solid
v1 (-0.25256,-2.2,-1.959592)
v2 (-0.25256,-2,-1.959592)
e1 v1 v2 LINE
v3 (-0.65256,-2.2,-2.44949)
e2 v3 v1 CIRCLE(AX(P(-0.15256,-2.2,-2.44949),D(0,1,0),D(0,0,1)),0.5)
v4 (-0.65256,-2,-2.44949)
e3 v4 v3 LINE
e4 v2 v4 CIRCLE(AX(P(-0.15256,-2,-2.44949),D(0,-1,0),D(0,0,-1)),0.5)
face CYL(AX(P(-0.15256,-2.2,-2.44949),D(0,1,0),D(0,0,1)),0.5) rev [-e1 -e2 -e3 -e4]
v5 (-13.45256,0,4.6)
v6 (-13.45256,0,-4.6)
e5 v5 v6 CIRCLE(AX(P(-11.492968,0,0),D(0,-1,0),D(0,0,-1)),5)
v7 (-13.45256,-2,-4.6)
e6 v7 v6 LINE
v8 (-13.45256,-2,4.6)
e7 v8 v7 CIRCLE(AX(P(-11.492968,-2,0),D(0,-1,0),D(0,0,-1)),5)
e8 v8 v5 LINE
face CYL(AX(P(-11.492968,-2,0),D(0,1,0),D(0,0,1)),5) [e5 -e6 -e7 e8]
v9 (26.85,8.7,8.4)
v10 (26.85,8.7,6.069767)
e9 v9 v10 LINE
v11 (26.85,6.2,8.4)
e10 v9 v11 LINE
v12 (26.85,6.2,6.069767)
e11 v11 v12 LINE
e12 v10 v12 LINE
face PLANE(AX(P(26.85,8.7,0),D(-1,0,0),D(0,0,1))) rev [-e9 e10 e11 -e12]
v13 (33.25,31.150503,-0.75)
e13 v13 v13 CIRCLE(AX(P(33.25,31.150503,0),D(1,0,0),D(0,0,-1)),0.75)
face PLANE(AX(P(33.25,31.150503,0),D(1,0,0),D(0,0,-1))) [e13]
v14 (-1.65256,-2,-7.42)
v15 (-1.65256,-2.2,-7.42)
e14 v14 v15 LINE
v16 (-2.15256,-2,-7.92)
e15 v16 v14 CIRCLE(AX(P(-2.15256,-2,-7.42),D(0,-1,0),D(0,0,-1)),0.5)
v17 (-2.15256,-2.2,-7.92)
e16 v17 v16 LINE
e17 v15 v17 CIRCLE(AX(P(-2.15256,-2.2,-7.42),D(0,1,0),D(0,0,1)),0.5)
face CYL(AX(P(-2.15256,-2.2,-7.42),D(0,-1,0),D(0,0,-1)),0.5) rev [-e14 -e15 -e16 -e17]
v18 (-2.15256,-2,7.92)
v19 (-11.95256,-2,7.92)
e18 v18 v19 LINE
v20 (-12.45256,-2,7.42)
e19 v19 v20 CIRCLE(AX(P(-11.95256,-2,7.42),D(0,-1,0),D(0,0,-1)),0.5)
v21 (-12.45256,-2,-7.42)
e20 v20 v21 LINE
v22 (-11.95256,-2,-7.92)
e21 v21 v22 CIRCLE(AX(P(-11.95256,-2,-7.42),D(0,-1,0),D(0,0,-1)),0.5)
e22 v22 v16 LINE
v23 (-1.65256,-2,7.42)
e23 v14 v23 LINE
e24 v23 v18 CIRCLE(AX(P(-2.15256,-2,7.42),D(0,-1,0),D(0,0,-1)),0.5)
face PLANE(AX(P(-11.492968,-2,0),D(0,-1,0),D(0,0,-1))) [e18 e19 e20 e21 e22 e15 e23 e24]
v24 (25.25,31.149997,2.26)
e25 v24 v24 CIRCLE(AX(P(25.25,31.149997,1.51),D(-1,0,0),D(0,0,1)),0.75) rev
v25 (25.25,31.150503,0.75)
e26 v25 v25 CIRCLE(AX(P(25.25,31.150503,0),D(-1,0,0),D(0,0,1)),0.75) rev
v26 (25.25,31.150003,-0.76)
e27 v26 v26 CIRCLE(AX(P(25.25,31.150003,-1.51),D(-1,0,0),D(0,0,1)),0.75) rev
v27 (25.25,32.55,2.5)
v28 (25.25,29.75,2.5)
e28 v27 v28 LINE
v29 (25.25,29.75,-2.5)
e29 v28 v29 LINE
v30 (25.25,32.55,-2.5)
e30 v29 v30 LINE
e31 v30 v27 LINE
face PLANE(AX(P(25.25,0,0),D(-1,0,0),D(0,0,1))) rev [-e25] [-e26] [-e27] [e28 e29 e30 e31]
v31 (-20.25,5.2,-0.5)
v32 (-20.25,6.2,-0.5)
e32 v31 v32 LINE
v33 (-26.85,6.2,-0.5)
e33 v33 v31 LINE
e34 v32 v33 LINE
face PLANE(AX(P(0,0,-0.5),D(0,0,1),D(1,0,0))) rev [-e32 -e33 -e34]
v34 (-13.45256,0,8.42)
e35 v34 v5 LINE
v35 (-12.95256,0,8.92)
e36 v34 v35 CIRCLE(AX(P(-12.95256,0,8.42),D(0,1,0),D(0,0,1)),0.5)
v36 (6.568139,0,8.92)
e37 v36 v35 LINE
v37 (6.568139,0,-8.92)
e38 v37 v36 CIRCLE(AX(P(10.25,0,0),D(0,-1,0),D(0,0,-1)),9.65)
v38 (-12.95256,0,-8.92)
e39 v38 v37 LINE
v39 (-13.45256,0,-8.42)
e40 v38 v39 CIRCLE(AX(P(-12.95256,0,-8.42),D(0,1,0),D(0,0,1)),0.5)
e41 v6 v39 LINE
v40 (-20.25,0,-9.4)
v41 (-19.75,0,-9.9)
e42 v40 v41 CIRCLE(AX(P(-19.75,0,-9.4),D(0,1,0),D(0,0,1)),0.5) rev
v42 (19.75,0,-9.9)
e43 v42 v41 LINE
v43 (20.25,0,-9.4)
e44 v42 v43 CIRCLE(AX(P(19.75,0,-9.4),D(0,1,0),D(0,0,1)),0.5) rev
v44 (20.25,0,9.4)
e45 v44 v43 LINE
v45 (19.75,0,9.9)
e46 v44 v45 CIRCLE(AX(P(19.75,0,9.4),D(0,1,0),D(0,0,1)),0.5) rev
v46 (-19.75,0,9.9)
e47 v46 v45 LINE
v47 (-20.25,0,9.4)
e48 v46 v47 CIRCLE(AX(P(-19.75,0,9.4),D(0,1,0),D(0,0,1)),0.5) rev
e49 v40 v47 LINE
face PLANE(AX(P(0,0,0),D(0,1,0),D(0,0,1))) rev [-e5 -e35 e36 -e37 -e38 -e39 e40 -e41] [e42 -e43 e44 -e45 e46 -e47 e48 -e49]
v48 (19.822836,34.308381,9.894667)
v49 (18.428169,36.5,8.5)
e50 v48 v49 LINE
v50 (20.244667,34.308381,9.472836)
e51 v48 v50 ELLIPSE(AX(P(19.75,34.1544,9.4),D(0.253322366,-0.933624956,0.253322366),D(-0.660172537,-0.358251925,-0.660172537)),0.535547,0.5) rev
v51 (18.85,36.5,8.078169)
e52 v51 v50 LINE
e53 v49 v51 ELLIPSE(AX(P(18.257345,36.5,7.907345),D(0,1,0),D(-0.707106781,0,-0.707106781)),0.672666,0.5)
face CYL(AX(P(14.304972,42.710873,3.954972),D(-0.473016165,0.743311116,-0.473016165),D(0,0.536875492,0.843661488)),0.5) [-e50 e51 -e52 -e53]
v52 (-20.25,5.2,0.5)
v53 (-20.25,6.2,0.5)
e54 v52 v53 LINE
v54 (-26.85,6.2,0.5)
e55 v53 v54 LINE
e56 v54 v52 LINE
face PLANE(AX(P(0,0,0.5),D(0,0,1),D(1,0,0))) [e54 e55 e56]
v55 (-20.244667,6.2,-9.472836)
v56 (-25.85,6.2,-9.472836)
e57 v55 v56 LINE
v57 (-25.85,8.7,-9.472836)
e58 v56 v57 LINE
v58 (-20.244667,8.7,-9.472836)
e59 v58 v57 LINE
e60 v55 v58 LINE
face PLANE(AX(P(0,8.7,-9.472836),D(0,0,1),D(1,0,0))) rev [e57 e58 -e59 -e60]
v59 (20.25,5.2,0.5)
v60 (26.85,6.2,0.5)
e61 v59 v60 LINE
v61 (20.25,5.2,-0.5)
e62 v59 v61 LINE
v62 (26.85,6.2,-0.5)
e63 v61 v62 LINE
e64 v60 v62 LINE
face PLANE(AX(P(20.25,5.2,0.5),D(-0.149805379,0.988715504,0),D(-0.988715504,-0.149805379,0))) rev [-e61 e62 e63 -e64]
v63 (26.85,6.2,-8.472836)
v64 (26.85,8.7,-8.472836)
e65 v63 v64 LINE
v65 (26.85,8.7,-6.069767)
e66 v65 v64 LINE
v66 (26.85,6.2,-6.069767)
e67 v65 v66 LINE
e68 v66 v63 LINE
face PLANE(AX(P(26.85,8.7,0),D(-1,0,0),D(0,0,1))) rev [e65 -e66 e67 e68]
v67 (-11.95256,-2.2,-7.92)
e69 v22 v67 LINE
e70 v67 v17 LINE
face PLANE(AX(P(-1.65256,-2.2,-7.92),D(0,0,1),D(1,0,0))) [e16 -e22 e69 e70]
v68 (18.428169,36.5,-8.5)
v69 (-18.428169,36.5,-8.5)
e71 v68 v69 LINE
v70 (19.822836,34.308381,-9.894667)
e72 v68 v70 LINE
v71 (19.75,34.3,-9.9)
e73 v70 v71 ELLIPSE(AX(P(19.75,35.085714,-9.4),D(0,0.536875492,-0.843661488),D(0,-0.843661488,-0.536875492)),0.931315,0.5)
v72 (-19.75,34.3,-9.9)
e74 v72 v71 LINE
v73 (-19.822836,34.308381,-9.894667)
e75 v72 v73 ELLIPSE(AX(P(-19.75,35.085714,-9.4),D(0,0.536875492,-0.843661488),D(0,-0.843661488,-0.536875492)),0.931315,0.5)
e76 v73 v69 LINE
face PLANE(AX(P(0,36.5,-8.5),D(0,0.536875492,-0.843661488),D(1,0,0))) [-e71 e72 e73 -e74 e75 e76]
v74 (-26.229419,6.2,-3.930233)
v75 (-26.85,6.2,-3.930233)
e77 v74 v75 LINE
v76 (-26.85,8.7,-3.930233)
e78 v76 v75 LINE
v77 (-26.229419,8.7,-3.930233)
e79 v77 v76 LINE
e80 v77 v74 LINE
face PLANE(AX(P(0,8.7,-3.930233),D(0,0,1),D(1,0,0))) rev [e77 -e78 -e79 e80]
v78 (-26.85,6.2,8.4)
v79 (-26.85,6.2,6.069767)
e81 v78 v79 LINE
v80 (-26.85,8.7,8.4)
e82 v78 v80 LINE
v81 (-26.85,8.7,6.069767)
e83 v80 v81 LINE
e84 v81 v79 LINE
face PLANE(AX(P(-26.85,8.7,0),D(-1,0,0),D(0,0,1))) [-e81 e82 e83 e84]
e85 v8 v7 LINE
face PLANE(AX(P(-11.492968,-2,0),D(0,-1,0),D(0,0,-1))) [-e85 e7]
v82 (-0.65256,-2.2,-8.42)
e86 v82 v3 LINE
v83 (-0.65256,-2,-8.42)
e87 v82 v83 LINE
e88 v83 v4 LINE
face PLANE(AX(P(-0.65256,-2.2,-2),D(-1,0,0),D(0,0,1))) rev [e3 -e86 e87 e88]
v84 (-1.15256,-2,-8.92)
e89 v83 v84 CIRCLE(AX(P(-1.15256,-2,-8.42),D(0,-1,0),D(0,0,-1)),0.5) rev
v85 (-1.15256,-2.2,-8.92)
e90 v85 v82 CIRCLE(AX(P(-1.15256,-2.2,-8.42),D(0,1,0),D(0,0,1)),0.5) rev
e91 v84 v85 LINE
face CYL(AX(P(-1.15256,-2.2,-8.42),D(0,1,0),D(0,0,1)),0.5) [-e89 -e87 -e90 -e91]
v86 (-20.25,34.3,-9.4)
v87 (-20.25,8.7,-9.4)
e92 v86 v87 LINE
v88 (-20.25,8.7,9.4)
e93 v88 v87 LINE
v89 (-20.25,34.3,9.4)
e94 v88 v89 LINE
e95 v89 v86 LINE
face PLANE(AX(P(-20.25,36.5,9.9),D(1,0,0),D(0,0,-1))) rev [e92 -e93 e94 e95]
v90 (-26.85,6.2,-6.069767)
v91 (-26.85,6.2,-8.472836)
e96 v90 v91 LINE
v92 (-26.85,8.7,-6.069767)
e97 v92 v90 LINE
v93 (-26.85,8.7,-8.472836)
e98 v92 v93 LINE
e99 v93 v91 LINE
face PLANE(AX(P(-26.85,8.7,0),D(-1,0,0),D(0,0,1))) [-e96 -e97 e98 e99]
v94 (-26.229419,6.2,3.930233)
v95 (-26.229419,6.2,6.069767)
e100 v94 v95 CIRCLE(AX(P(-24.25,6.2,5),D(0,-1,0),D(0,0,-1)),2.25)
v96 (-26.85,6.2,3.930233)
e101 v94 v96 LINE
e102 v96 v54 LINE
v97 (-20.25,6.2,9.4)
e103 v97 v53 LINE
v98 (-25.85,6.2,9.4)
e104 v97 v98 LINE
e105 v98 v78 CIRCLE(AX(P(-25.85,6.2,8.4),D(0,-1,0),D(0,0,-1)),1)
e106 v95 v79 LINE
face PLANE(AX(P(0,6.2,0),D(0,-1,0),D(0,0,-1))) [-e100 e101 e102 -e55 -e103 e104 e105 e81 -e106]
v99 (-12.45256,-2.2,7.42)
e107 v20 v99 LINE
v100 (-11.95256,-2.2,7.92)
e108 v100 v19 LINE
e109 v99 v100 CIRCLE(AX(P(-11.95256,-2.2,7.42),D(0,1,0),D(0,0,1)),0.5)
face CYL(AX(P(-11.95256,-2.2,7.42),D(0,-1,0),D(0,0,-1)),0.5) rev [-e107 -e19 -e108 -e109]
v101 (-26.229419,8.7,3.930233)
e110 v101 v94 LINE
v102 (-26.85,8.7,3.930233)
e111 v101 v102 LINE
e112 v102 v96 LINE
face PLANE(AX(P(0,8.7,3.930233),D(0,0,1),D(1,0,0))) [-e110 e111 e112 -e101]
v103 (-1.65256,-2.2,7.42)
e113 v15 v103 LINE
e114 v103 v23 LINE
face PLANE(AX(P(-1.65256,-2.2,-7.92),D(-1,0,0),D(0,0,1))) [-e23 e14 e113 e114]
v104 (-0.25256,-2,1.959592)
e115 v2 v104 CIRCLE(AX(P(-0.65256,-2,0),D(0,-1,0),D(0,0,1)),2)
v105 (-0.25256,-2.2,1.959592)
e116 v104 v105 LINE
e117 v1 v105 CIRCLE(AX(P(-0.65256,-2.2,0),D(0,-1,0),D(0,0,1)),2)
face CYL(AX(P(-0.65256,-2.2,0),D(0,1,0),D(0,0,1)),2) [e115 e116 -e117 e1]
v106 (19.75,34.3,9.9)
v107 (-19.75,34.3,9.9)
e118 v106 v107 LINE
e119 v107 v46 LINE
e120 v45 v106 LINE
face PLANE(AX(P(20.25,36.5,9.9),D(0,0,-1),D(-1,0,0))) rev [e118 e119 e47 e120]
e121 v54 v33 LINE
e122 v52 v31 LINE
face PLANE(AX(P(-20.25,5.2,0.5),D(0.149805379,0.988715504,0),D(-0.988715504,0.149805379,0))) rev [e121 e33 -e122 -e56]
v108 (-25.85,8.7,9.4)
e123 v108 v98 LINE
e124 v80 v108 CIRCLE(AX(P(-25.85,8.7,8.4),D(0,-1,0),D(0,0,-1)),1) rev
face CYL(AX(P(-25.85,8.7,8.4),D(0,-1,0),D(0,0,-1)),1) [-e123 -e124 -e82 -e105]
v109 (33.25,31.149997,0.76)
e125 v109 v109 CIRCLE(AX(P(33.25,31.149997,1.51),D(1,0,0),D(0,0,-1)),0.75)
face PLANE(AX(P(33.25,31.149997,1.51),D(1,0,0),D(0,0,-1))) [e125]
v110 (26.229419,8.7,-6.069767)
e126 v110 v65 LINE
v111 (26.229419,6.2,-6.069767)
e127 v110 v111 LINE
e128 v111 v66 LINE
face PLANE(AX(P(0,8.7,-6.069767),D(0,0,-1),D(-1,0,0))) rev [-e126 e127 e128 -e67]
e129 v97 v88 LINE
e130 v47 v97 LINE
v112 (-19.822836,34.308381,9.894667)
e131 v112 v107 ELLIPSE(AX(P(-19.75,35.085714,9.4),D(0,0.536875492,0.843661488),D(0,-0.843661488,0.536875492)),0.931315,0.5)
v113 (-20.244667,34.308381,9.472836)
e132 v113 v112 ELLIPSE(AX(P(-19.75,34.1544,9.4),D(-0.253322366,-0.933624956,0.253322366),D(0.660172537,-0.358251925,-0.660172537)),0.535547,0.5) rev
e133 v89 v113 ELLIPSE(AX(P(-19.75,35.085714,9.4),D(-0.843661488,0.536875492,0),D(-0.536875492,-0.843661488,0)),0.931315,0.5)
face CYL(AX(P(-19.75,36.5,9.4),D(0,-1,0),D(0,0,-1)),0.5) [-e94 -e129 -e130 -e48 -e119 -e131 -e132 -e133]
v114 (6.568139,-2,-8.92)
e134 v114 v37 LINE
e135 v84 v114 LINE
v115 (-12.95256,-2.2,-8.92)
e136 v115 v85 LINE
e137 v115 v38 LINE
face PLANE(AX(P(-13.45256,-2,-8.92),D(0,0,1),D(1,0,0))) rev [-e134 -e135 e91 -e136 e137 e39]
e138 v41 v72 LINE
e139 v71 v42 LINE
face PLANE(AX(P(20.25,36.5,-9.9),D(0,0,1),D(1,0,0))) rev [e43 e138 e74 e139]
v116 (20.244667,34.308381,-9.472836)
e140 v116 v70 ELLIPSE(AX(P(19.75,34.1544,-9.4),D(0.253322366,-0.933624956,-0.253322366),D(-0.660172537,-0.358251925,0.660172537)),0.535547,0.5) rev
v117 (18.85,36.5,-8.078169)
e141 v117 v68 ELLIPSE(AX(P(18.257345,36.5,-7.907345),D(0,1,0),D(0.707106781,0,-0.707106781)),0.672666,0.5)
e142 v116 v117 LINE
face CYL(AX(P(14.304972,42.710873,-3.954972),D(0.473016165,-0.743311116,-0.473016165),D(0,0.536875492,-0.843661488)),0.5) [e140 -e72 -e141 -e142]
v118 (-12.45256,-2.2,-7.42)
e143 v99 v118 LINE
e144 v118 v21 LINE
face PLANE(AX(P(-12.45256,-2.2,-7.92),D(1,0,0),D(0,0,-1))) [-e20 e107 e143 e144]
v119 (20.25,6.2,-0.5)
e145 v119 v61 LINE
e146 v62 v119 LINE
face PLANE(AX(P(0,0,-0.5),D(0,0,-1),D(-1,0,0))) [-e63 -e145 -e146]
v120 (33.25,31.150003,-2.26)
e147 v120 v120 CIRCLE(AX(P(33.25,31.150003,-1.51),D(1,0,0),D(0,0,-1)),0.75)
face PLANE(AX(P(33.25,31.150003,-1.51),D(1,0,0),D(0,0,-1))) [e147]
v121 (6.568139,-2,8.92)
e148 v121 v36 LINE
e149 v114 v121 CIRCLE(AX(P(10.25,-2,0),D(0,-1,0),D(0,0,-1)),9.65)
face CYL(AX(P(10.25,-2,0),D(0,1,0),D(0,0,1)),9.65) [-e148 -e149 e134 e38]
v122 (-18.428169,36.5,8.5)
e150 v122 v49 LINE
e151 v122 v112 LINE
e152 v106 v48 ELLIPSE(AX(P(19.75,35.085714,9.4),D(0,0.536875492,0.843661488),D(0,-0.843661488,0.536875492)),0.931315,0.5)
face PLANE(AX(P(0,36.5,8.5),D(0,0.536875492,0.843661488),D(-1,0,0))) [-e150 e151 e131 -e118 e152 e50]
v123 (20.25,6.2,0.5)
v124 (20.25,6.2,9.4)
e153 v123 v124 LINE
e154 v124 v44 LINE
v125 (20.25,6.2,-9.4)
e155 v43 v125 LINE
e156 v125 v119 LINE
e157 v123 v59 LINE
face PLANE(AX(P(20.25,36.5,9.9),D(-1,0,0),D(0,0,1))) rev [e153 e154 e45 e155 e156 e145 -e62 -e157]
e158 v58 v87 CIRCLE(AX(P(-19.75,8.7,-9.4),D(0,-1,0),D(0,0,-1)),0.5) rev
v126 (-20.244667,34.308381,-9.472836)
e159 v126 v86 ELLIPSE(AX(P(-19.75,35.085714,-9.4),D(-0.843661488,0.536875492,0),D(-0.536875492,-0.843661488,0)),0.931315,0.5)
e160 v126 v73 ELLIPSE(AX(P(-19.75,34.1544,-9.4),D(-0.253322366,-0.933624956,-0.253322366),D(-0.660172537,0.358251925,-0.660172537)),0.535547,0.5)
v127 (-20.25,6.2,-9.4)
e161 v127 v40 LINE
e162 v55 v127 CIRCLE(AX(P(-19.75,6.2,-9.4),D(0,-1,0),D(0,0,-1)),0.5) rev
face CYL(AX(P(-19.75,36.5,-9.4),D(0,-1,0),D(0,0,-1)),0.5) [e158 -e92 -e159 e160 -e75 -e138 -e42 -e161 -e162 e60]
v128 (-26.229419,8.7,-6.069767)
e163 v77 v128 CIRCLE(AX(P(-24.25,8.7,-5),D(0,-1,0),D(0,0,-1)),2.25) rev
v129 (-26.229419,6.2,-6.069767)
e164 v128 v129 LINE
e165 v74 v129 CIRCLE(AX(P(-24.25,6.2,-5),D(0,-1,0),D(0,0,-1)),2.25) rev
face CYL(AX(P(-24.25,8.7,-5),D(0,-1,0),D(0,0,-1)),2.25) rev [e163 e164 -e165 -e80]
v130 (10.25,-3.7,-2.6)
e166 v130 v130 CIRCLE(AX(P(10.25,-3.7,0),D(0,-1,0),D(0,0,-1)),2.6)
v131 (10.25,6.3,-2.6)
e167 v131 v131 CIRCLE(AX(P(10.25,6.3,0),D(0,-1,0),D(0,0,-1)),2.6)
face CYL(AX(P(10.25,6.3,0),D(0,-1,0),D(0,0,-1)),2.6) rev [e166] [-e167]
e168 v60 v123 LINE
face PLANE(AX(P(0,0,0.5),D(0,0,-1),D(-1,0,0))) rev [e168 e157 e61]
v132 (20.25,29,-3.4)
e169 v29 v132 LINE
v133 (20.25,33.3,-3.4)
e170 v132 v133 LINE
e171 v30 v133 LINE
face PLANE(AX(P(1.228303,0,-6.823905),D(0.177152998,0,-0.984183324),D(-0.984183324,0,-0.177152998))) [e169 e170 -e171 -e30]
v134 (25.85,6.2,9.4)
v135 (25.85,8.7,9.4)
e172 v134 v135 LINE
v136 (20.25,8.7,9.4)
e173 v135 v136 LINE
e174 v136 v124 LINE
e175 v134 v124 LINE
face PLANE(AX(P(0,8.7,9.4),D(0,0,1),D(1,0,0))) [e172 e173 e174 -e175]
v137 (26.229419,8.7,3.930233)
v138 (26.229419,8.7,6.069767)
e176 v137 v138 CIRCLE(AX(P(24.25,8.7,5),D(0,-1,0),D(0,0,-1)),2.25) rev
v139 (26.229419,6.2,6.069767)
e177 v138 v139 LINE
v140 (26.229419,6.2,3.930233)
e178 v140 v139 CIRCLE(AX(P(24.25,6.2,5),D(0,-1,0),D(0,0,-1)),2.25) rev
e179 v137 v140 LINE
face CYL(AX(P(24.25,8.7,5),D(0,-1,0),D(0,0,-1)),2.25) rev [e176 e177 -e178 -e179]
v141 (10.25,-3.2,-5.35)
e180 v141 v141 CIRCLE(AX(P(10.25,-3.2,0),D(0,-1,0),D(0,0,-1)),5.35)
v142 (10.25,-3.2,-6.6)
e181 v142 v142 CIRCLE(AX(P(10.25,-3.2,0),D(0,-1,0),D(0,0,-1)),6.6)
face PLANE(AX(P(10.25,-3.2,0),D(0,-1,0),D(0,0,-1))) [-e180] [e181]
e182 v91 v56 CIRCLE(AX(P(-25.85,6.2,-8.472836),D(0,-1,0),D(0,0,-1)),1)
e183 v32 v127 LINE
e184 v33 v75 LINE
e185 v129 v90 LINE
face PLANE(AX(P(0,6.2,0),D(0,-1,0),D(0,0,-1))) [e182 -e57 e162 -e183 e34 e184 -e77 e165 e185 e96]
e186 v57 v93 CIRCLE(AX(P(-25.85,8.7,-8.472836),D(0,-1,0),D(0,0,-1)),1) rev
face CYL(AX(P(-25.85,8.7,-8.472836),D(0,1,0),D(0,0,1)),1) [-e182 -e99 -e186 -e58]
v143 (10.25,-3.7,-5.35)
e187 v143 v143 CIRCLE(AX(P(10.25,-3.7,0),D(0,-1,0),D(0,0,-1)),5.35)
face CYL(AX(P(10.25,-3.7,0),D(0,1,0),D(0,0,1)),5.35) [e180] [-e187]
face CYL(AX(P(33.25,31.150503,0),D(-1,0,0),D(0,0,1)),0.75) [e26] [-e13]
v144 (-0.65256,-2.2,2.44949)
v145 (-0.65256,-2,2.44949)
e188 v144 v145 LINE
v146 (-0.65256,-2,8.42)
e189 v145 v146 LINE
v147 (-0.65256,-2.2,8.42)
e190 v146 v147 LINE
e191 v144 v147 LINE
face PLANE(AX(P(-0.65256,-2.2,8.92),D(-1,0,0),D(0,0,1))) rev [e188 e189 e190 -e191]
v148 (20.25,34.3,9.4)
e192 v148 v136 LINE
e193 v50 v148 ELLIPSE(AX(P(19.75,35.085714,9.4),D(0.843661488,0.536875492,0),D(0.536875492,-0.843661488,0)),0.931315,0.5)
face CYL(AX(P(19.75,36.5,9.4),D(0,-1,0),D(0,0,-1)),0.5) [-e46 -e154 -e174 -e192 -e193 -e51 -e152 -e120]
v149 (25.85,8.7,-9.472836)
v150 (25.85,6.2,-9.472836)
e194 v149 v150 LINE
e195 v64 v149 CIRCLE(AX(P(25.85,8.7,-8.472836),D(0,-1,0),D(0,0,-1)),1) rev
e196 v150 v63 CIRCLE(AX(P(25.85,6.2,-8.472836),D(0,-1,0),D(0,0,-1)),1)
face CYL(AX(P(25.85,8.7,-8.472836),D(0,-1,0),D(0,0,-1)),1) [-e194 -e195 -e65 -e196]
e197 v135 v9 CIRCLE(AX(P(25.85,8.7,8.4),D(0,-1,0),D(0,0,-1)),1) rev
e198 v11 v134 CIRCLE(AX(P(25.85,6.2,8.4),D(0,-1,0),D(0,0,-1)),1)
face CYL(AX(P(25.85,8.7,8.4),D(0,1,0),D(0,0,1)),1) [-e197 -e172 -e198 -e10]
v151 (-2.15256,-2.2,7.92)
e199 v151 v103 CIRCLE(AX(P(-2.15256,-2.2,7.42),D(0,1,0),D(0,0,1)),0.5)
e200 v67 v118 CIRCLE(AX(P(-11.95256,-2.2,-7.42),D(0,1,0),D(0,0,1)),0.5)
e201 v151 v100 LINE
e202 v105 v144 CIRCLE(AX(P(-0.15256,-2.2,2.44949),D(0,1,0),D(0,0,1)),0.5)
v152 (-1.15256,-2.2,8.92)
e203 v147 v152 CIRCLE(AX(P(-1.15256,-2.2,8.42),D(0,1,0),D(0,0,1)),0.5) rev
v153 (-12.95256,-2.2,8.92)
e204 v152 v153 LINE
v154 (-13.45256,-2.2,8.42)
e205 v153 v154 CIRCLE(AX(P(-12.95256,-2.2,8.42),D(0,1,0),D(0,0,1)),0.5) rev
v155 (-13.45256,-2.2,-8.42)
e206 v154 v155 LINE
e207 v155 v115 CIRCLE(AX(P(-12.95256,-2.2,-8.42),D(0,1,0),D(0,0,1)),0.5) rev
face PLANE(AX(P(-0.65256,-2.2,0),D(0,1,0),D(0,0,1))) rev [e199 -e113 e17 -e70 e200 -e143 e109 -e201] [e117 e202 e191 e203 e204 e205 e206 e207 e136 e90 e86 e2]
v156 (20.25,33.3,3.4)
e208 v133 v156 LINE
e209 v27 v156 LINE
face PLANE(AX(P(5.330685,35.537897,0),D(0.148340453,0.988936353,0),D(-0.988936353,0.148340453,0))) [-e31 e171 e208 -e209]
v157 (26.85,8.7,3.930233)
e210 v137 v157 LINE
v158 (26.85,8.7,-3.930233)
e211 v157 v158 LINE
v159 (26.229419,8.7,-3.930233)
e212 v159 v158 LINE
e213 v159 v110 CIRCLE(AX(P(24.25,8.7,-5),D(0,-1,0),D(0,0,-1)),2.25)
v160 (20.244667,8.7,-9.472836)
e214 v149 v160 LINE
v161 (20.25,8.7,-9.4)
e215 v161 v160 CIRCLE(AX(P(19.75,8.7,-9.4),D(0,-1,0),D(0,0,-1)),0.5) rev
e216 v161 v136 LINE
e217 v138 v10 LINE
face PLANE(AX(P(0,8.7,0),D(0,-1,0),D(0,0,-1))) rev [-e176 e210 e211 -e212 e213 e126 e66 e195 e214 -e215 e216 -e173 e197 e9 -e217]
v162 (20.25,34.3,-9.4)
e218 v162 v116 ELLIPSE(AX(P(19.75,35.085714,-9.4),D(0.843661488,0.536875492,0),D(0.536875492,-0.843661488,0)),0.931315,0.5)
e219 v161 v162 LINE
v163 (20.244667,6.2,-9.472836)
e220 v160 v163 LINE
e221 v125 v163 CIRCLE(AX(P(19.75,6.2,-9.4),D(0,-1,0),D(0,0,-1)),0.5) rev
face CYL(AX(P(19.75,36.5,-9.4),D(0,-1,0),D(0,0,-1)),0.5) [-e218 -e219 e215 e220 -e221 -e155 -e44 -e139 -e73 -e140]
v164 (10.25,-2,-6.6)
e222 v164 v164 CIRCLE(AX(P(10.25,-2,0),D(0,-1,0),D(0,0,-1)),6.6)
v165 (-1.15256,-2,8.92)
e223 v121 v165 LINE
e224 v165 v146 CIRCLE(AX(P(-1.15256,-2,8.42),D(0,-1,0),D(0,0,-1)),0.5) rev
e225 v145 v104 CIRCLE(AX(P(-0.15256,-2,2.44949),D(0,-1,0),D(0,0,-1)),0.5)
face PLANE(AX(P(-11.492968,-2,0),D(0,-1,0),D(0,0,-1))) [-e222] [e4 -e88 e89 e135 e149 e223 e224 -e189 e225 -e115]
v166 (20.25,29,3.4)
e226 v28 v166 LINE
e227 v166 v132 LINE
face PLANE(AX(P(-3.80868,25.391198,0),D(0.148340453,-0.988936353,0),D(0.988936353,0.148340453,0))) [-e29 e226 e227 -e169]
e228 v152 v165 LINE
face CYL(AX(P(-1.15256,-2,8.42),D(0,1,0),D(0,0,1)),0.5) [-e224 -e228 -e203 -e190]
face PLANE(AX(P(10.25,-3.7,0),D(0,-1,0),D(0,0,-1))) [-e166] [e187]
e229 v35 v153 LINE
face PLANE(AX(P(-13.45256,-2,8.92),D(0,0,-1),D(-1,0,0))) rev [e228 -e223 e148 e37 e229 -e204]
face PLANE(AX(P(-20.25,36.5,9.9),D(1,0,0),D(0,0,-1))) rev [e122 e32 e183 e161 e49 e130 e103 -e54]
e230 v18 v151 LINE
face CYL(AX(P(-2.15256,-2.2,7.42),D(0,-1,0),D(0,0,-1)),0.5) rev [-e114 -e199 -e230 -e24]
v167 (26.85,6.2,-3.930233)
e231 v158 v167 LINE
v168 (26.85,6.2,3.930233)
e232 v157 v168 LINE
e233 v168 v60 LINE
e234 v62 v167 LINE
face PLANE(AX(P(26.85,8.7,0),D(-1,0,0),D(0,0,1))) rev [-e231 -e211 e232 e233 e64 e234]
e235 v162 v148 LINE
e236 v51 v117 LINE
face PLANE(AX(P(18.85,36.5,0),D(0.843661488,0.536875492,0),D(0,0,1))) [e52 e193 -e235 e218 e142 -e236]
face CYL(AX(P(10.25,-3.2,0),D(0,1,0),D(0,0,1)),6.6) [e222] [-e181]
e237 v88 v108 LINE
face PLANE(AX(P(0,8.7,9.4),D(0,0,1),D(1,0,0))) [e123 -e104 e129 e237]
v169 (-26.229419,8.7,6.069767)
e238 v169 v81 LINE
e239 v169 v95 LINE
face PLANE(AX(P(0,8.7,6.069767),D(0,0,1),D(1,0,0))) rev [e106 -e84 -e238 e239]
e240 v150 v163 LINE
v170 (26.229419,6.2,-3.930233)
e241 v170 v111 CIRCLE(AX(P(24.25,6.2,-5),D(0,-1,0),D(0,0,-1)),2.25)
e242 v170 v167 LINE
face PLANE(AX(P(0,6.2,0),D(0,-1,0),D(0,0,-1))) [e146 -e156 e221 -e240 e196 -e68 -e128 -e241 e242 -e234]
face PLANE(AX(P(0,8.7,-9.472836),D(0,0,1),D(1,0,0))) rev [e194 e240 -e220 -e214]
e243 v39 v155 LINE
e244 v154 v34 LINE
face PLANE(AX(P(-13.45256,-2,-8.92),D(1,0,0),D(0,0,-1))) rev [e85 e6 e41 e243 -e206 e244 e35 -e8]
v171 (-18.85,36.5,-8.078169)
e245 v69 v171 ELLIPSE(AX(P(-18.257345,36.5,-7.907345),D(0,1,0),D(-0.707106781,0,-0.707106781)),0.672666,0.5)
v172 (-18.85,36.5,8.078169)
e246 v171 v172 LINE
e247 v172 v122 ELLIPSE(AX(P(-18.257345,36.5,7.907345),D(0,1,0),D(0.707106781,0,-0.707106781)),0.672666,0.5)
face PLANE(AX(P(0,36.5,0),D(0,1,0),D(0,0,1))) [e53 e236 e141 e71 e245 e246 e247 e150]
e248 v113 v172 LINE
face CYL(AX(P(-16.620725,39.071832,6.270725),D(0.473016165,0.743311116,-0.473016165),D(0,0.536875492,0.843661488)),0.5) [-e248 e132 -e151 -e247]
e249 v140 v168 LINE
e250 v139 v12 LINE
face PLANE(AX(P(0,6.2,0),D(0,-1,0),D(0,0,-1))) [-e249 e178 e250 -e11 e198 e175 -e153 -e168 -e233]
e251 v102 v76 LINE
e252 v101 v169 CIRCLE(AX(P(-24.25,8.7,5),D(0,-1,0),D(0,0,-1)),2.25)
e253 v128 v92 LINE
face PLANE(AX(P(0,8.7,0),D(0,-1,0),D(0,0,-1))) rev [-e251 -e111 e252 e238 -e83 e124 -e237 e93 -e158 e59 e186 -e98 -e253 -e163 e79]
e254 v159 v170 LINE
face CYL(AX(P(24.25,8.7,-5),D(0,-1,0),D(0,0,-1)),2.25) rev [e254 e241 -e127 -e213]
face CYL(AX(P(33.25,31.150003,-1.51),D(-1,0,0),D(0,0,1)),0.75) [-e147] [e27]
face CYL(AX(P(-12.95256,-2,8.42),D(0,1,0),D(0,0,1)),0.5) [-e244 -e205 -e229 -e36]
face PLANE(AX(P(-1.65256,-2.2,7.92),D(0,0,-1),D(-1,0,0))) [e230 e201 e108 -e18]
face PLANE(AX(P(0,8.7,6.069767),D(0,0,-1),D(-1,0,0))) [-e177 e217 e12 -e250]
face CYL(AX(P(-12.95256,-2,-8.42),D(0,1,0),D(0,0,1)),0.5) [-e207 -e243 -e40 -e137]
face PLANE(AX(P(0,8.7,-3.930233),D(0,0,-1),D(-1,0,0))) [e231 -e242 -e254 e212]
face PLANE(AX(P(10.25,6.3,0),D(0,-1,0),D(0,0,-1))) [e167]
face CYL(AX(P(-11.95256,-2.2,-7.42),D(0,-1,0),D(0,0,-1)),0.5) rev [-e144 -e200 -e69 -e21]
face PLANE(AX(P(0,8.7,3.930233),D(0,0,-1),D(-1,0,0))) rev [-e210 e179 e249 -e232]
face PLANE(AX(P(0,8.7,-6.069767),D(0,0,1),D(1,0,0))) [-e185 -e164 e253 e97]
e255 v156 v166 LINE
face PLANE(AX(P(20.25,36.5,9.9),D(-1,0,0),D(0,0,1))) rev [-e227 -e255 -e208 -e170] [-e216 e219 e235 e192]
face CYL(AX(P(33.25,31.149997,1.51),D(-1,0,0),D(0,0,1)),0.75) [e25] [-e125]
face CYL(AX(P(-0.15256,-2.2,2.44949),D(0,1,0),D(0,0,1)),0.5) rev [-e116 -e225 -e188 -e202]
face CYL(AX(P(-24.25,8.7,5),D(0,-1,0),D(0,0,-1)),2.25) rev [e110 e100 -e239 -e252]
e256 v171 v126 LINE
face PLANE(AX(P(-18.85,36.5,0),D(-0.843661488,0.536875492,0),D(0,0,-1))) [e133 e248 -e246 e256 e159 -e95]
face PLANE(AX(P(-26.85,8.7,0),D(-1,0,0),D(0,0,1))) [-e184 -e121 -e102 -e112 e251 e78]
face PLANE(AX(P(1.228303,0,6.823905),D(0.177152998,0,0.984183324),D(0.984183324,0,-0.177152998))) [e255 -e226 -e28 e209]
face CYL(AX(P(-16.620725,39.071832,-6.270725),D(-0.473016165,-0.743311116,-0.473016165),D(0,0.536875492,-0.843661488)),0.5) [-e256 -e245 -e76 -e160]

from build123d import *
from OCP.BRepFilletAPI import BRepFilletAPI_MakeChamfer

# Parameters (mm, degrees)
SKETCH_1_W       = 40.5
SKETCH_1_H       = 19.8
BODY_DEPTH       = 36.5
CHAMFER_1_SIZE   = 2.2
CHAMFER_1_SIZE2  = 1.4
FILLET_1_R       = 0.5
MOUNT_DEPTH      = 2.5
FILLET_3_R       = 1
EXTRUDE_3_DEPTH  = 0.5
EXTRUDE_4_DEPTH  = 2
SKETCH_5_W       = 10.8
SKETCH_5_H       = 15.84
EXTRUDE_5_DEPTH  = 0.2
SKETCH_6_R       = 6.6
EXTRUDE_6_DEPTH  = 1.2
SKETCH_7_R       = 5.35
EXTRUDE_7_DEPTH  = 0.5
SKETCH_8_R       = 2.6
SHAFT_HOLE_DEPTH = 10
FILLET_2_R       = 0.5
SKETCH_11_R      = 0.75
EXTRUDE_10_DEPTH = 8


with BuildPart() as part:
    # Эскиз1 → Body (new body)
    with BuildSketch(Plane(origin=(0, 0, 0), x_dir=(1, 0, 0), z_dir=(0, 1, 0))):
        Rectangle(SKETCH_1_W, SKETCH_1_H)
    extrude(amount=BODY_DEPTH)

    # Фаска1: one chamfer whose edges measure the first distance from different faces: ONE call of the kernel's chamfer builder (chamfer() names one face for all edges)
    chamfer_1_edges_1 = [part.edges().sort_by_distance(p)[0] for p in [
        (20.25, 36.5, 0),
    ]]
    chamfer_1_side_1 = [part.faces().sort_by_distance(p)[0] for p in [
        (20.25, 18.25, 0),
    ]]
    chamfer_1_edges_2 = [part.edges().sort_by_distance(p)[0] for p in [
        (0, 36.5, -9.9),
    ]]
    chamfer_1_side_2 = [part.faces().sort_by_distance(p)[0] for p in [
        (0, 18.25, -9.9),
    ]]
    chamfer_1_edges_3 = [part.edges().sort_by_distance(p)[0] for p in [
        (-20.25, 36.5, 0),
    ]]
    chamfer_1_side_3 = [part.faces().sort_by_distance(p)[0] for p in [
        (-20.25, 18.25, 0),
    ]]
    chamfer_1_edges_4 = [part.edges().sort_by_distance(p)[0] for p in [
        (0, 36.5, 9.9),
    ]]
    chamfer_1_side_4 = [part.faces().sort_by_distance(p)[0] for p in [
        (0, 18.25, 9.9),
    ]]
    chamfer_1 = BRepFilletAPI_MakeChamfer(part.part.solid().wrapped)
    for e in chamfer_1_edges_1:
        chamfer_1.Add(CHAMFER_1_SIZE, CHAMFER_1_SIZE2, e.wrapped, chamfer_1_side_1[0].wrapped)  # the first distance lies on this face
    for e in chamfer_1_edges_2:
        chamfer_1.Add(CHAMFER_1_SIZE, CHAMFER_1_SIZE2, e.wrapped, chamfer_1_side_2[0].wrapped)  # the first distance lies on this face
    for e in chamfer_1_edges_3:
        chamfer_1.Add(CHAMFER_1_SIZE, CHAMFER_1_SIZE2, e.wrapped, chamfer_1_side_3[0].wrapped)  # the first distance lies on this face
    for e in chamfer_1_edges_4:
        chamfer_1.Add(CHAMFER_1_SIZE, CHAMFER_1_SIZE2, e.wrapped, chamfer_1_side_4[0].wrapped)  # the first distance lies on this face
    add(Compound.cast(chamfer_1.Shape()), mode=Mode.REPLACE)

    # Скругление1
    # the kernel refuses this fillet: 0.5 mm, written as the material it takes off along each edge
    with BuildSketch(Plane(origin=(-20.25, -1.25, 9.9), x_dir=(1, 0, 0), z_dir=(0, 1, 0)), Plane(origin=(-20.25, -1.25, -9.9), x_dir=(0, 0, 1), z_dir=(0, 1, 0))) as fillet_1_piece_1:
        with BuildLine():
            CenterArc((FILLET_1_R, FILLET_1_R), FILLET_1_R, 180, 90)
            Line((0, FILLET_1_R), (0, 0))
            Line((0, 0), (FILLET_1_R, 0))
        make_face()
    extrude(amount=36.8, mode=Mode.SUBTRACT)
    with BuildSketch(Plane(origin=(20.25, -1.25, -9.9), x_dir=(0, 0, 1), z_dir=(0, 1, 0)), Plane(origin=(20.25, -1.25, 9.9), x_dir=(-1, 0, 0), z_dir=(0, 1, 0))) as fillet_1_piece_2:
        with BuildLine():
            CenterArc((FILLET_1_R, -FILLET_1_R), FILLET_1_R, 90, 90)
            Line((0, -FILLET_1_R), (0, 0))
            Line((0, 0), (FILLET_1_R, 0))
        make_face()
    extrude(amount=36.8, mode=Mode.SUBTRACT)
    with BuildSketch(Plane(origin=(20.689497717, 33.609360731, -10.339497717), x_dir=(0.25395078633508533, -0.3990655213836877, 0.8810537485094523), z_dir=(-0.47301616487963943, 0.7433111162394352, 0.47301616487964004)), Plane(origin=(20.689497717, 33.609360731, 10.339497717), x_dir=(-0.8810537485094526, -0.39906552138369156, 0.25395078633507817), z_dir=(-0.47301616487963943, 0.7433111162394352, -0.47301616487964004))) as fillet_1_piece_3:
        with BuildLine():
            CenterArc((FILLET_1_R * 0.743311116239, -FILLET_1_R), FILLET_1_R, 90, 73.247664886)
            Line((-FILLET_1_R * 0.21424849821, -FILLET_1_R * 0.711764705882), (0, 0))
            Line((0, 0), (FILLET_1_R * 0.743311116239, 0))
        make_face()
    extrude(amount=4.818007508, mode=Mode.SUBTRACT)
    with BuildSketch(Plane(origin=(-20.689497717, 33.609360731, -10.339497717), x_dir=(-0.25395078633507856, -0.3990655213836921, 0.8810537485094524), z_dir=(0.47301616487963943, 0.7433111162394352, 0.47301616487964004)), Plane(origin=(-20.689497717, 33.609360731, 10.339497717), x_dir=(0.8810537485094527, -0.3990655213836916, 0.25395078633507817), z_dir=(0.47301616487963943, 0.7433111162394352, -0.47301616487964004))) as fillet_1_piece_4:
        with BuildLine():
            CenterArc((FILLET_1_R * 0.743311116239, FILLET_1_R), FILLET_1_R, 196.752335114, 73.247664886)
            Line((-FILLET_1_R * 0.21424849821, FILLET_1_R * 0.711764705882), (0, 0))
            Line((0, 0), (FILLET_1_R * 0.743311116239, 0))
        make_face()
    extrude(amount=4.818007508, mode=Mode.SUBTRACT)

    # Эскиз2 → Mount (add)
    with BuildSketch(Plane(origin=(0, 6.2, 0), x_dir=(-1, 0, 0), z_dir=(0, -1, 0))):
        with BuildLine():
            Line((-26.85, 9.472835762), (26.85, 9.472835762))
            Line((26.85, 9.472835762), (26.85, 6.069767442))
            Line((26.85, 6.069767442), (26.229418506, 6.069767442))
            ThreePointArc((26.229418506, 6.069767442), (22, 5), (26.229418506, 3.930232558))
            Line((26.229418506, 3.930232558), (26.85, 3.930232558))
            Line((26.85, 3.930232558), (26.85, -3.930232558))
            Line((26.85, -3.930232558), (26.229418506, -3.930232558))
            ThreePointArc((26.229418506, -3.930232558), (22, -5), (26.229418506, -6.069767442))
            Line((26.229418506, -6.069767442), (26.85, -6.069767442))
            Line((26.85, -6.069767442), (26.85, -9.4))
            Line((26.85, -9.4), (-26.85, -9.4))
            Line((-26.85, -9.4), (-26.85, -6.069767442))
            Line((-26.85, -6.069767442), (-26.229418506, -6.069767442))
            ThreePointArc((-26.229418506, -6.069767442), (-22, -5), (-26.229418506, -3.930232558))
            Line((-26.229418506, -3.930232558), (-26.85, -3.930232558))
            Line((-26.85, -3.930232558), (-26.85, 3.930232558))
            Line((-26.85, 3.930232558), (-26.229418506, 3.930232558))
            ThreePointArc((-26.229418506, 3.930232558), (-22, 5), (-26.229418506, 6.069767442))
            Line((-26.229418506, 6.069767442), (-26.85, 6.069767442))
            Line((-26.85, 6.069767442), (-26.85, 9.472835762))
        make_face()
    extrude(amount=-MOUNT_DEPTH)

    # Скругление3
    fillet_3_edges = [part.edges().sort_by_distance(p)[0] for p in [
        (-26.85, 7.45, 9.4),
        (26.85, 7.45, 9.4),
        (26.85, 7.45, -9.472835762),
        (-26.85, 7.45, -9.472835762),
    ]]
    fillet(fillet_3_edges, radius=FILLET_3_R)

    # Эскиз3 → Бобышка-Вытянуть3 (add, symmetric)
    with BuildSketch(Plane.XY):
        Polygon((-26.85, 6.2), (-20.25, 6.2), (-20.25, 5.2), align=None)
        Polygon((20.25, 5.2), (26.85, 6.2), (20.25, 6.2), align=None)
    extrude(amount=EXTRUDE_3_DEPTH, both=True)

    # Эскиз4 → Бобышка-Вытянуть4 (add)
    with BuildSketch(Plane.XZ):
        with BuildLine():
            Line((-13.452560024, -8.92), (-13.452560024, -4.6))
            ThreePointArc((-13.452560024, -4.6), (-16.49296823, 0), (-13.452560024, 4.6))
            Line((-13.452560024, 4.6), (-13.452560024, 8.92))
            Line((-13.452560024, 8.92), (6.568139057, 8.92))
            ThreePointArc((6.568139057, 8.92), (19.9, 0), (6.568139057, -8.92))
            Line((6.568139057, -8.92), (-13.452560024, -8.92))
        make_face()
    extrude(amount=EXTRUDE_4_DEPTH)

    # Эскиз5 → Бобышка-Вытянуть5 (add)
    with BuildSketch(Plane.XZ.offset(2)):
        with BuildLine():
            Line((-13.452560024, 8.92), (-0.652560024, 8.92))
            Line((-0.652560024, 8.92), (-0.652560024, 2))
            ThreePointArc((-0.652560024, 2), (1.347439976, 0), (-0.652560024, -2))
            Line((-0.652560024, -2), (-0.652560024, -8.92))
            Line((-0.652560024, -8.92), (-13.452560024, -8.92))
            Line((-13.452560024, -8.92), (-13.452560024, 8.92))
        make_face()
        with Locations((-7.052560024, 0)):
            Rectangle(SKETCH_5_W, SKETCH_5_H, mode=Mode.SUBTRACT)
    extrude(amount=EXTRUDE_5_DEPTH)

    # Эскиз6 → Бобышка-Вытянуть6 (add)
    with BuildSketch(Plane.XZ.offset(2)):
        with Locations(Location((10.25, 0, 0), (0, 0, 270))):
            Circle(SKETCH_6_R)
    extrude(amount=EXTRUDE_6_DEPTH)

    # Эскиз7 → Бобышка-Вытянуть7 (add)
    with BuildSketch(Plane.XZ.offset(3.2)):
        with Locations(Location((10.25, 0, 0), (0, 0, 270))):
            Circle(SKETCH_7_R)
    extrude(amount=EXTRUDE_7_DEPTH)

    # Эскиз8 → Shaft hole (cut)
    with BuildSketch(Plane.XZ.offset(3.7)):
        with Locations(Location((10.25, 0, 0), (0, 0, 270))):
            Circle(SKETCH_8_R)
    extrude(amount=-SHAFT_HOLE_DEPTH, mode=Mode.SUBTRACT)

    # Скругление2
    fillet_2_edges = [part.edges().sort_by_distance(p)[0] for p in [
        (-13.452560024, -1.1, 8.92),
        (-0.652560024, -2.1, 2),
        (-0.652560024, -2.1, -2),
        (-0.652560024, -2.1, 8.92),
        (-0.652560024, -2.1, -8.92),
        (-13.452560024, -1.1, -8.92),
        (-1.652560024, -2.1, 7.92),
        (-1.652560024, -2.1, -7.92),
        (-12.452560024, -2.1, 7.92),
        (-12.452560024, -2.1, -7.92),
    ]]
    fillet(fillet_2_edges, radius=FILLET_2_R)

    # Эскиз10 → Rubber section 0
    with BuildSketch(Plane(origin=(25.25, 0, 0), x_dir=(0, 0, -1), z_dir=(1, 0, 0))):
        with BuildLine():
            Line((-2.5, 29.75), (2.5, 29.75))
            Line((2.5, 29.75), (2.5, 32.55))
            Line((2.5, 32.55), (-2.5, 32.55))
            Line((-2.5, 32.55), (-2.5, 29.75))
        make_face()
    # Эскиз9 → Rubber section 1
    with BuildSketch(Plane(origin=(20.25, 0, 0), x_dir=(0, 0, -1), z_dir=(1, 0, 0))):
        with BuildLine():
            Line((-3.4, 33.3), (3.4, 33.3))
            Line((3.4, 33.3), (3.4, 29))
            Line((3.4, 29), (-3.4, 29))
            Line((-3.4, 29), (-3.4, 33.3))
        make_face()
    loft()

    # Эскиз11 → Бобышка-Вытянуть10 (add)
    with BuildSketch(Plane(origin=(25.25, 0, 0), x_dir=(0, 0, -1), z_dir=(1, 0, 0))):
        with Locations(Location((0, 31.150503064, 0), (0, 0, 180))):
            Circle(SKETCH_11_R)
        with Locations(Location((1.509999917, 31.15000331, 0), (0, 0, 180))):
            Circle(SKETCH_11_R)
        with Locations(Location((-1.509999915, 31.149996646, 0), (0, 0, 180))):
            Circle(SKETCH_11_R)
    extrude(amount=EXTRUDE_10_DEPTH)


solid = part.part
